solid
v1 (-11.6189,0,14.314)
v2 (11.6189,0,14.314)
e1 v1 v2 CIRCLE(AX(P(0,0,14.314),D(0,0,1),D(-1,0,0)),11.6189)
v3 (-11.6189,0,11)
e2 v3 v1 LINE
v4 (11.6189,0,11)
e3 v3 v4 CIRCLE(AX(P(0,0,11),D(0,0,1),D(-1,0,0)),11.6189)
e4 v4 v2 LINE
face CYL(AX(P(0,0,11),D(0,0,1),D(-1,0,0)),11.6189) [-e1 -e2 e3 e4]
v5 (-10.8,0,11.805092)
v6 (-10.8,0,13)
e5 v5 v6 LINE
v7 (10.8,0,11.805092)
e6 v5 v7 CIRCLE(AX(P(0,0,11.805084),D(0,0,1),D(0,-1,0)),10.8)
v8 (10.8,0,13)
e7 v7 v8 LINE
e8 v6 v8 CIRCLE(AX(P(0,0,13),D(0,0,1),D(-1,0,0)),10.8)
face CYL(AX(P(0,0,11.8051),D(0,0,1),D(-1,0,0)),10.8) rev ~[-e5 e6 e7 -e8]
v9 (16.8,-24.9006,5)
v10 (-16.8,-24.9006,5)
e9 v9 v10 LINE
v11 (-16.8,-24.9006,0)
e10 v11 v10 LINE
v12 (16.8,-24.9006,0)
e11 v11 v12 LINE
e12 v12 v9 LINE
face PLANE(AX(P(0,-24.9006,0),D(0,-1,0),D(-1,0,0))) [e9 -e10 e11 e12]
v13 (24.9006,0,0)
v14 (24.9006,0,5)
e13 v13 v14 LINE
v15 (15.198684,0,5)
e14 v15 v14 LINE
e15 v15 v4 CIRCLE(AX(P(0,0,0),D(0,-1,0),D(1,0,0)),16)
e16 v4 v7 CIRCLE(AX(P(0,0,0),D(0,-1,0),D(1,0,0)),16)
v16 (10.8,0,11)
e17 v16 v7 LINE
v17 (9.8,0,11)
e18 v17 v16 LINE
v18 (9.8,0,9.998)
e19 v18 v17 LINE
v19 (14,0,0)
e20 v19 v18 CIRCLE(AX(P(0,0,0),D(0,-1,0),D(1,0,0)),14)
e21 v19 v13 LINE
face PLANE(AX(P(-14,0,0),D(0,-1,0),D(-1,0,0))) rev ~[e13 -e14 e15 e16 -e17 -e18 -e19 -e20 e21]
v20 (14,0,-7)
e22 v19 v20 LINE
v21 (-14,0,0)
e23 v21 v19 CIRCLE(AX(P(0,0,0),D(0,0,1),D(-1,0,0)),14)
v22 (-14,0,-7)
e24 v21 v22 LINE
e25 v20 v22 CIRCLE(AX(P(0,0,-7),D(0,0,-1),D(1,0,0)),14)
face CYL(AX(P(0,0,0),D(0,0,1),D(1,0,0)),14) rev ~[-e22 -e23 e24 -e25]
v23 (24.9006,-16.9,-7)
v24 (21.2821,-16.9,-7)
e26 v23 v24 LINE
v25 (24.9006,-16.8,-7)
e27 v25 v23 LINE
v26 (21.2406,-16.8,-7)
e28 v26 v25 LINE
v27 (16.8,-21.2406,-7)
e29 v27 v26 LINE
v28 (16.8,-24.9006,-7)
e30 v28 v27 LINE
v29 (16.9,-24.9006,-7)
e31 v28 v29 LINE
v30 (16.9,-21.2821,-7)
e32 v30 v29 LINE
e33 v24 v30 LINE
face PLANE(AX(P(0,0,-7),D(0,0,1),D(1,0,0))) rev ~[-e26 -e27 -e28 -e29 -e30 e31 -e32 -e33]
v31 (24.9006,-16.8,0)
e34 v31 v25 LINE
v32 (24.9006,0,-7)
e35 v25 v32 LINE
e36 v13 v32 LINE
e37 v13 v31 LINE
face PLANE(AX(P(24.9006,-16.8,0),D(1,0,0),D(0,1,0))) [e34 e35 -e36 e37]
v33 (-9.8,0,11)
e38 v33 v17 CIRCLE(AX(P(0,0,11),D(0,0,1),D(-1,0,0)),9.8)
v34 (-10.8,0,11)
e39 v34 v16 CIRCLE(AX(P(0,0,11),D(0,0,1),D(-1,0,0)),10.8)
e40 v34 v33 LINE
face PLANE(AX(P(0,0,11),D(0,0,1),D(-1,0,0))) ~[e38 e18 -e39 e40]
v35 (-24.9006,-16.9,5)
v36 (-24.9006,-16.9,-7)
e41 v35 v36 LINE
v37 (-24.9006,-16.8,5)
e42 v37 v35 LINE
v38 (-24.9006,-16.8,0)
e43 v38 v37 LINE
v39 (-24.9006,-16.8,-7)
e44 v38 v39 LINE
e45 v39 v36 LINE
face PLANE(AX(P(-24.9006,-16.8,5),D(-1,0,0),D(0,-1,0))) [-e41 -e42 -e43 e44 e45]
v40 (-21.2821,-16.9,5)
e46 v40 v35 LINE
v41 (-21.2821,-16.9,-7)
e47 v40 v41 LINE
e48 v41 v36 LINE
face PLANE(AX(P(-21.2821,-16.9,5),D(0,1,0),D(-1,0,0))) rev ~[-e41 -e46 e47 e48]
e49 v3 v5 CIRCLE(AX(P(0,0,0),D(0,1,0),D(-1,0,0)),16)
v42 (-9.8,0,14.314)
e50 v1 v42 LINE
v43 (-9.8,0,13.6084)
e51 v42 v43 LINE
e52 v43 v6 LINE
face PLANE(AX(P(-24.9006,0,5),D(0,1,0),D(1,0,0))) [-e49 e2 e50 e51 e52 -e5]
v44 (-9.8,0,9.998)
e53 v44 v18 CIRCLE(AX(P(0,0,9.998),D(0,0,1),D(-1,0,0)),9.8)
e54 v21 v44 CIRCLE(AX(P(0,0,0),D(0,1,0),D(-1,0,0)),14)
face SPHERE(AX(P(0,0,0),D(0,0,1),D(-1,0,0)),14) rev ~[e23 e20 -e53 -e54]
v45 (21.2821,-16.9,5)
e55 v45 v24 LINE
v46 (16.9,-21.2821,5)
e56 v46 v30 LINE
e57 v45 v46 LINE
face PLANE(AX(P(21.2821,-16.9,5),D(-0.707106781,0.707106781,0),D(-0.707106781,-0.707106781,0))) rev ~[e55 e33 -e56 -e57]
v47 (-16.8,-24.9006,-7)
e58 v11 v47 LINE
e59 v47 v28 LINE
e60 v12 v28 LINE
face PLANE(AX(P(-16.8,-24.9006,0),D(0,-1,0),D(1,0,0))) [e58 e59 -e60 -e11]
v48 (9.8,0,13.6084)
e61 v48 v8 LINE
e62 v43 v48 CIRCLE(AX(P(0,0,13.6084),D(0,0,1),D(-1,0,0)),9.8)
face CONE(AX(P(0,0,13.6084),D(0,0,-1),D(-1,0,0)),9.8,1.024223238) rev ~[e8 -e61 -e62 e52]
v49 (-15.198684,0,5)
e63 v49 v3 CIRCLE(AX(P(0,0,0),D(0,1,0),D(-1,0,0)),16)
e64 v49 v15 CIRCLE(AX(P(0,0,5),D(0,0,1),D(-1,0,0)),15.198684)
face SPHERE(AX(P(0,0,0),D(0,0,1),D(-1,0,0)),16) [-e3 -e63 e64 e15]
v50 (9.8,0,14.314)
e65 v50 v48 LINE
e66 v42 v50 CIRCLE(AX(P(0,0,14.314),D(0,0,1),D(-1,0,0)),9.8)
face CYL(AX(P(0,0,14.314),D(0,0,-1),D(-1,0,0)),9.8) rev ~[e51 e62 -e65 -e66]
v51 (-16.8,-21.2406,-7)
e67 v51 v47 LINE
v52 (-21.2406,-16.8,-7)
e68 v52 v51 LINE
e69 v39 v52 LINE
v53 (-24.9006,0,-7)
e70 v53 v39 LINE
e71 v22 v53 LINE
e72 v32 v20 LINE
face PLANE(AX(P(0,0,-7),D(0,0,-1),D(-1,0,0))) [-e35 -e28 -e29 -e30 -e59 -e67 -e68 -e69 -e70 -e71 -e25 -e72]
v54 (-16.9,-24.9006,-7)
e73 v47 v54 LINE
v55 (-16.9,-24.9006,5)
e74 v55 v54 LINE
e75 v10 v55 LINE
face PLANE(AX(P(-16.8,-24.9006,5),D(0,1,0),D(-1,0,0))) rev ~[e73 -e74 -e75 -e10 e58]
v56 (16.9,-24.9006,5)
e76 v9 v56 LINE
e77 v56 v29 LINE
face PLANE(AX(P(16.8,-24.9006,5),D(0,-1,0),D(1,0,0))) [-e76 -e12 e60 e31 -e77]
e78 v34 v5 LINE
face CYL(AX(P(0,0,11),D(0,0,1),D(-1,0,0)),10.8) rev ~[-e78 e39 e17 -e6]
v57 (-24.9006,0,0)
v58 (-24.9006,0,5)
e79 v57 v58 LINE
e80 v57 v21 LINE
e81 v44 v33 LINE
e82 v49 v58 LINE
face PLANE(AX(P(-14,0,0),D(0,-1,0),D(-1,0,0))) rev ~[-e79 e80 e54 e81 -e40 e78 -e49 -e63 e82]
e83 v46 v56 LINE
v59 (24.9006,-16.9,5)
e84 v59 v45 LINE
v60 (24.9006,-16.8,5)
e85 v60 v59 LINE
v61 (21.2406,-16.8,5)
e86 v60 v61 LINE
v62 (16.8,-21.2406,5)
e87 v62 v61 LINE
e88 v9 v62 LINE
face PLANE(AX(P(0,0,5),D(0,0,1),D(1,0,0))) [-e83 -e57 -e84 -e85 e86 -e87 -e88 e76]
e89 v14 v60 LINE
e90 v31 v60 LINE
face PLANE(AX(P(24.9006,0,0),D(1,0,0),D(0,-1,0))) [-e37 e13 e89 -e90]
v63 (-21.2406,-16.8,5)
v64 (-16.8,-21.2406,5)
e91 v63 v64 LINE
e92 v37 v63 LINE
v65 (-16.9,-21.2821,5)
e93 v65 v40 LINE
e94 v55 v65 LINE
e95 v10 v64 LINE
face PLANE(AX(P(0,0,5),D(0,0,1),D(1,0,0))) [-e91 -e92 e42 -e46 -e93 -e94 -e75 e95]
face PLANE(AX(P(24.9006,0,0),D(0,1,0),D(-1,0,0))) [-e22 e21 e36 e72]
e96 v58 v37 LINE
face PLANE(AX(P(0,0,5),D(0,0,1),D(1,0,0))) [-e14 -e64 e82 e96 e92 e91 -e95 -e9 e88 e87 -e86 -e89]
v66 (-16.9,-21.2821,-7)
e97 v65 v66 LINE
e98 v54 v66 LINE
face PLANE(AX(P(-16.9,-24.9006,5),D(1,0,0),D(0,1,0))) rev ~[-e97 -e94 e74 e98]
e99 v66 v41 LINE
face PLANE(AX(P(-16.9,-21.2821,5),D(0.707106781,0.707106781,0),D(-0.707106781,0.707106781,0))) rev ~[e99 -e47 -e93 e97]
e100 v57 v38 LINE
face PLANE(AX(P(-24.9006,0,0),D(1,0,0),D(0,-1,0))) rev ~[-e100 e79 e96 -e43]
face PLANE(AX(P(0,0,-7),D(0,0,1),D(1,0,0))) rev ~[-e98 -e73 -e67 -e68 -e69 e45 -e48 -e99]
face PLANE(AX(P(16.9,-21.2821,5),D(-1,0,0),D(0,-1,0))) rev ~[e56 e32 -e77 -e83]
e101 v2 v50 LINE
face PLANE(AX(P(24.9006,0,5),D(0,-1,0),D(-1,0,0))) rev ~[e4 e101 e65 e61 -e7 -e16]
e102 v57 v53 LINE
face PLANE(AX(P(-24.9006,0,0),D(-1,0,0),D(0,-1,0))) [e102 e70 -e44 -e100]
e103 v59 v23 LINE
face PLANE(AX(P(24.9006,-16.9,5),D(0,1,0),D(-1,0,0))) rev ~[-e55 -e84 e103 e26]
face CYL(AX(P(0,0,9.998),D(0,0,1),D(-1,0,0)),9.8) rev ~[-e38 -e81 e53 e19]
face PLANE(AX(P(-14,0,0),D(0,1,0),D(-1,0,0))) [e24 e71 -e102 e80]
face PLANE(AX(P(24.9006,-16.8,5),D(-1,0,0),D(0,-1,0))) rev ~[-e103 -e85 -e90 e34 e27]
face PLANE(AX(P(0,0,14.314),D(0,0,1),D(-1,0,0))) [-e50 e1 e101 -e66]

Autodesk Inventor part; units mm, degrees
ref_plane "YZ Plane" through (0, 0, 0) normal (1, 0, 0) x (0, 1, 0)
ref_plane "XZ Plane" through (0, 0, 0) normal (0, 1, 0) x (-1, 0, 0)
sketch "Sketch1" plane through (0, 0, 0) normal (0, 0, 1) x (1, 0, 0)
  line L0 (-36.8533, 0) -> (46.8153, 0) construction
  line L1 (0, -29.8808) -> (0, 4.9801) construction
  line L2 (0, 0) -> (24.6516, -24.6516) construction
  line L3 (0, 0) -> (34.8626, 0) construction
  line L4 (0, -24.9006) -> (16.8, -24.9006)
  line L5 (16.8, -24.9006) -> (16.8, -21.2406)
  line L6 (16.8, -21.2406) -> (19.0203, -19.0203)
  line L7 (24.9006, 0) -> (24.9006, -16.8)
  line L8 (24.9006, -16.8) -> (21.2406, -16.8)
  line L9 (21.2406, -16.8) -> (19.0203, -19.0203)
  line L10 (0, 0) -> (-24.6516, -24.6516) construction
  line L11 (0, -24.9006) -> (-16.8, -24.9006)
  line L12 (-16.8, -24.9006) -> (-16.8, -21.2406)
  line L13 (-16.8, -21.2406) -> (-19.0203, -19.0203)
  line L14 (-24.9006, 0) -> (-24.9006, -16.8)
  line L15 (-24.9006, -16.8) -> (-21.2406, -16.8)
  line L16 (-21.2406, -16.8) -> (-19.0203, -19.0203)
  arc A0 (-14, 0) -> (14, 0) centre (0, 0) ccw
  line L17 (0, 0) -> (14, 0) construction
  line L18 (0, 0) -> (-14, 0) construction
  line L19 (-14, 0) -> (-24.9006, 0)
  line L20 (14, 0) -> (24.9006, 0)
  dimension "d0" = 45
  dimension "d1" = 16.8
  dimension "d2" = 3.66
  dimension "d4" = 3.14
  dimension "d5" = 14
  dimension "d6" = 180
extrude "Extrusion1" add sketch "Sketch1" along normal blind 5
sketch "Sketch3" plane through (-24.9006, 0, 0) normal (0, 1, 0) x (1, 0, 0)
  line L0 (10.9006, 0) -> (0, 0) construction
  line L1 (0, 0) -> (0, -5) construction
  line L2 (10.9006, -5) -> (0, -5) construction
  line L3 (10.9006, 0) -> (10.9006, -5) construction
  line L4 (38.9006, 0) -> (10.9006, 0) construction
  line L5 (10.9006, 0) -> (10.9006, -5) construction
  line L6 (38.9006, -5) -> (10.9006, -5) construction
  line L7 (38.9006, 0) -> (38.9006, -5) construction
  line L8 (49.8013, 0) -> (38.9006, 0) construction
  line L9 (38.9006, 0) -> (38.9006, -5) construction
  line L10 (49.8013, -5) -> (38.9006, -5) construction
  line L11 (49.8013, 0) -> (49.8013, -5) construction
  line L12 (24.9006, 18.5006) -> (24.9006, -23.5037) construction
  arc A0 (10.9006, 0) -> (24.9006, -14) centre (24.9006, 0) ccw
  arc A1 (8.9006, 0) -> (24.9006, -16) centre (24.9006, 0) ccw
  line L13 (24.9006, -16) -> (24.9006, -14)
  line L14 (10.9006, 0) -> (0, 0) projected
  line L15 (8.9006, 0) -> (10.9006, 0)
  dimension "d11" = 2
revolve "Revolution2" add sketch "Sketch3" angle 180 about axis through (0, 0, -10) along (0, 0, 1)
ref_plane "Work Plane1" through (0, 0, 16) normal (0, 0, 1) x (1, 0, 0)
sketch "Sketch5" plane through (24.9006, 0, 5) normal (0, 1, 0) x (1, 0, 0)
  line L0 (0, 0) -> (-9.7019, 0) construction
  line L1 (0, 5) -> (0, 0) construction
  line L2 (0, 5) -> (-10.9006, 5) construction
  arc A0 (-38.9006, 5) -> (-10.9006, 5) centre (-24.9006, 5) ccw construction
  line L3 (-38.9006, 5) -> (-49.8013, 5) construction
  line L4 (-49.8013, 5) -> (-49.8013, 0) construction
  line L5 (-40.0993, 0) -> (-49.8013, 0) construction
  arc A1 (-40.0993, 0) -> (-9.7019, 0) centre (-24.9006, 5) ccw construction
  arc A2 (-38.9006, 5) -> (-10.9006, 5) centre (-24.9006, 5) ccw construction
  line L6 (-10.9006, 5) -> (-38.9006, 5) construction
  line L7 (-24.9006, 25) -> (-24.9006, -17) construction
  line L8 (-24.9006, -6) -> (-35.7006, -6)
  line L9 (-35.7006, -6) -> (-35.7006, -8.1)
  line L10 (-35.7006, -8.1) -> (-24.9006, -8.1)
  line L11 (-24.9006, -8.1) -> (-24.9006, -6)
  arc A3 (-10.9006, 5) -> (-38.9006, 5) centre (-24.9006, 5) ccw construction
  line L12 (-24.9006, 19) -> (-24.9006, -6) construction
  line L13 (-24.9006, 19) -> (0.0994, 19) construction
  line L14 (-34.7006, -6) -> (-33.5609, -6)
  line L15 (-33.5609, -6) -> (-33.5609, -4.998)
  line L16 (-33.5609, -4.998) -> (-34.7006, -4.998)
  line L17 (-34.7006, -4.998) -> (-34.7006, -6)
  arc A4 (-38.9006, 5) -> (-10.9006, 5) centre (-24.9006, 5) ccw projected
  line L18 (-24.9006, -8.1) -> (-34.087, -8.1)
  line L19 (-34.087, -8.1) -> (-34.087, -11)
  line L20 (-34.087, -11) -> (-24.9006, -11)
  line L21 (-24.9006, -11) -> (-24.9006, -8.1)
  arc A5 (-40.0993, 0) -> (-9.7019, 0) centre (-24.9006, 5) ccw projected
  dimension "d16" = 10.8
  dimension "d17" = 2.1
  dimension "d19" = 25
  dimension "d20" = 90
  dimension "d21" = 1
revolve "Revolution3" cut sketch "Sketch5" angle 360 about axis through (0, 0, -10) along (0, 0, 1) contours L11 L10 A4 L8 | A4 L10 A5 L9 L8 | L8 L17 A4 | L21 A4 L10 | A4 L21 A5 L10 | L10 L9 A5
sketch "Sketch6" plane through (-24.9006, 0, 5) normal (0, 1, 0) x (1, 0, 0)
  line L0 (14.1006, -6.8051) -> (14.1006, -6) construction
  line L1 (14.1006, -6) -> (15.1006, -6) construction
  line L2 (15.1006, -6) -> (15.1006, -4.998) construction
  arc A0 (10.9006, 5) -> (15.1006, -4.998) centre (24.9006, 5) ccw construction
  line L3 (10.9006, 5) -> (0, 5) construction
  line L4 (0, 5) -> (0, 0) construction
  line L5 (9.7019, 0) -> (0, 0) construction
  arc A1 (9.7019, 0) -> (14.1006, -6.8051) centre (24.9006, 5) ccw construction
  line L6 (24.9006, 7.4176) -> (24.9006, -9.5058) construction
  arc A2 (9.7019, 0) -> (14.1006, -6.8051) centre (24.9006, 5) ccw projected
  line L7 (13.2817, -6) -> (13.2817, -9.314)
  line L8 (14.1006, -6) -> (24.9006, -6) construction
  line L9 (24.9006, -6) -> (24.9006, -8) construction
  line L10 (24.9006, -8) -> (14.1006, -8) construction
  line L11 (14.1006, -8) -> (14.1006, -6) construction
  line L12 (35.7006, -6) -> (14.1006, -6) construction
  line L13 (14.1006, -6) -> (24.9006, -6) construction
  line L14 (24.9006, -6) -> (24.9006, -11.2) construction
  line L15 (24.9006, -11.2) -> (14.1006, -11.2) construction
  line L16 (14.1006, -11.2) -> (14.1006, -6) construction
  arc A3 (14.1006, -8) -> (24.9006, -11.2) centre (24.9006, 8.625) ccw construction
  line L17 (14.1006, -6.8051) -> (14.1006, -8)
  line L18 (13.2817, -9.314) -> (15.1006, -9.314)
  line L19 (15.1006, -9.314) -> (15.1006, -8.6084)
  line L20 (15.1006, -8.6084) -> (14.1006, -8)
  line L21 (13.2817, -6) -> (14.1006, -6)
  line L22 (35.7006, -6.8051) -> (14.1006, -6.8051) projected
  line L23 (14.1006, -6.8051) -> (14.1006, -6)
  dimension "d23" = 2
  dimension "d24" = 5.2
revolve "Revolution4" add sketch "Sketch6" angle 180 about axis through (0, 0, -10) along (0, 0, 1) contours A2 L17 L20 L19 L18 L7
sketch "Sketch7" plane through (0, 0, 0) normal (0, 0, -1) x (-1, 0, 0)
  line L0 (-24.9006, 0) -> (-14, 0) projected
  line L1 (-24.9006, -16.8) -> (-24.9006, 0) projected
  line L2 (-21.2406, -16.8) -> (-24.9006, -16.8) projected
  line L3 (-16.8, -21.2406) -> (-21.2406, -16.8) projected
  line L4 (-16.8, -24.9006) -> (-16.8, -21.2406) projected
  line L5 (16.8, -24.9006) -> (-16.8, -24.9006) projected
  line L6 (16.8, -21.2406) -> (16.8, -24.9006) projected
  line L7 (21.2406, -16.8) -> (16.8, -21.2406) projected
  line L8 (24.9006, -16.8) -> (21.2406, -16.8) projected
  line L9 (24.9006, 0) -> (24.9006, -16.8) projected
  line L10 (14, 0) -> (24.9006, 0) projected
  arc A0 (-14, 0) -> (14, 0) centre (0, 0) ccw projected
extrude "Extrusion3" add sketch "Sketch7" along normal blind 7
sketch "Skizze8" plane through (0, 0, 5) normal (0, 0, 1) x (1, 0, 0)
  arc A0 (-15.1987, 0) -> (15.1987, 0) centre (0, 0) ccw construction
  line L0 (-15.1987, 0) -> (-24.9006, 0) construction
  line L1 (-24.9006, 0) -> (-24.9006, -16.8) construction
  line L2 (-24.9006, -16.8) -> (-21.2406, -16.8) projected
  line L3 (-21.2406, -16.8) -> (-16.8, -21.2406) projected
  line L4 (-16.8, -21.2406) -> (-16.8, -24.9006) projected
  line L5 (-16.8, -24.9006) -> (16.8, -24.9006) construction
  line L6 (16.8, -24.9006) -> (16.8, -21.2406) projected
  line L7 (16.8, -21.2406) -> (21.2406, -16.8) projected
  line L8 (21.2406, -16.8) -> (24.9006, -16.8) projected
  line L9 (24.9006, -16.8) -> (24.9006, 0) construction
  line L10 (24.9006, 0) -> (15.1987, 0) construction
  line L11 (25.0006, 0.1) -> (25.0006, -16.9) construction
  line L12 (25.0006, -16.9) -> (21.2821, -16.9)
  line L13 (21.2821, -16.9) -> (16.9, -21.2821)
  line L14 (16.9, -21.2821) -> (16.9, -25.0006)
  line L15 (16.9, -25.0006) -> (-16.9, -25.0006) construction
  line L16 (-16.9, -25.0006) -> (-16.9, -21.2821)
  line L17 (-16.9, -21.2821) -> (-21.2821, -16.9)
  line L18 (-21.2821, -16.9) -> (-25.0006, -16.9)
  line L19 (-25.0006, -16.9) -> (-25.0006, 0.1) construction
  line L20 (-25.0006, 0.1) -> (-15.0984, 0.1) construction
  arc A1 (-15.0984, 0.1) -> (15.0984, 0.1) centre (0, 0) ccw construction
  line L21 (15.0984, 0.1) -> (25.0006, 0.1) construction
  line L22 (-24.9006, -16.8) -> (-24.9006, -16.9)
  line L23 (-16.8, -24.9006) -> (-16.9, -24.9006)
  line L24 (16.8, -24.9006) -> (-16.8, -24.9006) projected
  line L25 (16.8, -24.9006) -> (16.9, -24.9006)
  line L26 (24.9006, 0) -> (24.9006, -16.8) projected
  line L27 (24.9006, -16.8) -> (24.9006, -16.9)
  point P0 (0, 0)
  dimension "d0" = 45
  dimension "d1" = 16.8
  dimension "d2" = 3.66
  dimension "d4" = 3.14
  dimension "d5" = 14
  dimension "d6" = 180
  dimension "d28" = 0.1
extrude "IM_offset" add sketch "Skizze8" against normal up to surface (12 mm away)
properties part number "20_Cube_Insert_Eye_Lens_v3"
